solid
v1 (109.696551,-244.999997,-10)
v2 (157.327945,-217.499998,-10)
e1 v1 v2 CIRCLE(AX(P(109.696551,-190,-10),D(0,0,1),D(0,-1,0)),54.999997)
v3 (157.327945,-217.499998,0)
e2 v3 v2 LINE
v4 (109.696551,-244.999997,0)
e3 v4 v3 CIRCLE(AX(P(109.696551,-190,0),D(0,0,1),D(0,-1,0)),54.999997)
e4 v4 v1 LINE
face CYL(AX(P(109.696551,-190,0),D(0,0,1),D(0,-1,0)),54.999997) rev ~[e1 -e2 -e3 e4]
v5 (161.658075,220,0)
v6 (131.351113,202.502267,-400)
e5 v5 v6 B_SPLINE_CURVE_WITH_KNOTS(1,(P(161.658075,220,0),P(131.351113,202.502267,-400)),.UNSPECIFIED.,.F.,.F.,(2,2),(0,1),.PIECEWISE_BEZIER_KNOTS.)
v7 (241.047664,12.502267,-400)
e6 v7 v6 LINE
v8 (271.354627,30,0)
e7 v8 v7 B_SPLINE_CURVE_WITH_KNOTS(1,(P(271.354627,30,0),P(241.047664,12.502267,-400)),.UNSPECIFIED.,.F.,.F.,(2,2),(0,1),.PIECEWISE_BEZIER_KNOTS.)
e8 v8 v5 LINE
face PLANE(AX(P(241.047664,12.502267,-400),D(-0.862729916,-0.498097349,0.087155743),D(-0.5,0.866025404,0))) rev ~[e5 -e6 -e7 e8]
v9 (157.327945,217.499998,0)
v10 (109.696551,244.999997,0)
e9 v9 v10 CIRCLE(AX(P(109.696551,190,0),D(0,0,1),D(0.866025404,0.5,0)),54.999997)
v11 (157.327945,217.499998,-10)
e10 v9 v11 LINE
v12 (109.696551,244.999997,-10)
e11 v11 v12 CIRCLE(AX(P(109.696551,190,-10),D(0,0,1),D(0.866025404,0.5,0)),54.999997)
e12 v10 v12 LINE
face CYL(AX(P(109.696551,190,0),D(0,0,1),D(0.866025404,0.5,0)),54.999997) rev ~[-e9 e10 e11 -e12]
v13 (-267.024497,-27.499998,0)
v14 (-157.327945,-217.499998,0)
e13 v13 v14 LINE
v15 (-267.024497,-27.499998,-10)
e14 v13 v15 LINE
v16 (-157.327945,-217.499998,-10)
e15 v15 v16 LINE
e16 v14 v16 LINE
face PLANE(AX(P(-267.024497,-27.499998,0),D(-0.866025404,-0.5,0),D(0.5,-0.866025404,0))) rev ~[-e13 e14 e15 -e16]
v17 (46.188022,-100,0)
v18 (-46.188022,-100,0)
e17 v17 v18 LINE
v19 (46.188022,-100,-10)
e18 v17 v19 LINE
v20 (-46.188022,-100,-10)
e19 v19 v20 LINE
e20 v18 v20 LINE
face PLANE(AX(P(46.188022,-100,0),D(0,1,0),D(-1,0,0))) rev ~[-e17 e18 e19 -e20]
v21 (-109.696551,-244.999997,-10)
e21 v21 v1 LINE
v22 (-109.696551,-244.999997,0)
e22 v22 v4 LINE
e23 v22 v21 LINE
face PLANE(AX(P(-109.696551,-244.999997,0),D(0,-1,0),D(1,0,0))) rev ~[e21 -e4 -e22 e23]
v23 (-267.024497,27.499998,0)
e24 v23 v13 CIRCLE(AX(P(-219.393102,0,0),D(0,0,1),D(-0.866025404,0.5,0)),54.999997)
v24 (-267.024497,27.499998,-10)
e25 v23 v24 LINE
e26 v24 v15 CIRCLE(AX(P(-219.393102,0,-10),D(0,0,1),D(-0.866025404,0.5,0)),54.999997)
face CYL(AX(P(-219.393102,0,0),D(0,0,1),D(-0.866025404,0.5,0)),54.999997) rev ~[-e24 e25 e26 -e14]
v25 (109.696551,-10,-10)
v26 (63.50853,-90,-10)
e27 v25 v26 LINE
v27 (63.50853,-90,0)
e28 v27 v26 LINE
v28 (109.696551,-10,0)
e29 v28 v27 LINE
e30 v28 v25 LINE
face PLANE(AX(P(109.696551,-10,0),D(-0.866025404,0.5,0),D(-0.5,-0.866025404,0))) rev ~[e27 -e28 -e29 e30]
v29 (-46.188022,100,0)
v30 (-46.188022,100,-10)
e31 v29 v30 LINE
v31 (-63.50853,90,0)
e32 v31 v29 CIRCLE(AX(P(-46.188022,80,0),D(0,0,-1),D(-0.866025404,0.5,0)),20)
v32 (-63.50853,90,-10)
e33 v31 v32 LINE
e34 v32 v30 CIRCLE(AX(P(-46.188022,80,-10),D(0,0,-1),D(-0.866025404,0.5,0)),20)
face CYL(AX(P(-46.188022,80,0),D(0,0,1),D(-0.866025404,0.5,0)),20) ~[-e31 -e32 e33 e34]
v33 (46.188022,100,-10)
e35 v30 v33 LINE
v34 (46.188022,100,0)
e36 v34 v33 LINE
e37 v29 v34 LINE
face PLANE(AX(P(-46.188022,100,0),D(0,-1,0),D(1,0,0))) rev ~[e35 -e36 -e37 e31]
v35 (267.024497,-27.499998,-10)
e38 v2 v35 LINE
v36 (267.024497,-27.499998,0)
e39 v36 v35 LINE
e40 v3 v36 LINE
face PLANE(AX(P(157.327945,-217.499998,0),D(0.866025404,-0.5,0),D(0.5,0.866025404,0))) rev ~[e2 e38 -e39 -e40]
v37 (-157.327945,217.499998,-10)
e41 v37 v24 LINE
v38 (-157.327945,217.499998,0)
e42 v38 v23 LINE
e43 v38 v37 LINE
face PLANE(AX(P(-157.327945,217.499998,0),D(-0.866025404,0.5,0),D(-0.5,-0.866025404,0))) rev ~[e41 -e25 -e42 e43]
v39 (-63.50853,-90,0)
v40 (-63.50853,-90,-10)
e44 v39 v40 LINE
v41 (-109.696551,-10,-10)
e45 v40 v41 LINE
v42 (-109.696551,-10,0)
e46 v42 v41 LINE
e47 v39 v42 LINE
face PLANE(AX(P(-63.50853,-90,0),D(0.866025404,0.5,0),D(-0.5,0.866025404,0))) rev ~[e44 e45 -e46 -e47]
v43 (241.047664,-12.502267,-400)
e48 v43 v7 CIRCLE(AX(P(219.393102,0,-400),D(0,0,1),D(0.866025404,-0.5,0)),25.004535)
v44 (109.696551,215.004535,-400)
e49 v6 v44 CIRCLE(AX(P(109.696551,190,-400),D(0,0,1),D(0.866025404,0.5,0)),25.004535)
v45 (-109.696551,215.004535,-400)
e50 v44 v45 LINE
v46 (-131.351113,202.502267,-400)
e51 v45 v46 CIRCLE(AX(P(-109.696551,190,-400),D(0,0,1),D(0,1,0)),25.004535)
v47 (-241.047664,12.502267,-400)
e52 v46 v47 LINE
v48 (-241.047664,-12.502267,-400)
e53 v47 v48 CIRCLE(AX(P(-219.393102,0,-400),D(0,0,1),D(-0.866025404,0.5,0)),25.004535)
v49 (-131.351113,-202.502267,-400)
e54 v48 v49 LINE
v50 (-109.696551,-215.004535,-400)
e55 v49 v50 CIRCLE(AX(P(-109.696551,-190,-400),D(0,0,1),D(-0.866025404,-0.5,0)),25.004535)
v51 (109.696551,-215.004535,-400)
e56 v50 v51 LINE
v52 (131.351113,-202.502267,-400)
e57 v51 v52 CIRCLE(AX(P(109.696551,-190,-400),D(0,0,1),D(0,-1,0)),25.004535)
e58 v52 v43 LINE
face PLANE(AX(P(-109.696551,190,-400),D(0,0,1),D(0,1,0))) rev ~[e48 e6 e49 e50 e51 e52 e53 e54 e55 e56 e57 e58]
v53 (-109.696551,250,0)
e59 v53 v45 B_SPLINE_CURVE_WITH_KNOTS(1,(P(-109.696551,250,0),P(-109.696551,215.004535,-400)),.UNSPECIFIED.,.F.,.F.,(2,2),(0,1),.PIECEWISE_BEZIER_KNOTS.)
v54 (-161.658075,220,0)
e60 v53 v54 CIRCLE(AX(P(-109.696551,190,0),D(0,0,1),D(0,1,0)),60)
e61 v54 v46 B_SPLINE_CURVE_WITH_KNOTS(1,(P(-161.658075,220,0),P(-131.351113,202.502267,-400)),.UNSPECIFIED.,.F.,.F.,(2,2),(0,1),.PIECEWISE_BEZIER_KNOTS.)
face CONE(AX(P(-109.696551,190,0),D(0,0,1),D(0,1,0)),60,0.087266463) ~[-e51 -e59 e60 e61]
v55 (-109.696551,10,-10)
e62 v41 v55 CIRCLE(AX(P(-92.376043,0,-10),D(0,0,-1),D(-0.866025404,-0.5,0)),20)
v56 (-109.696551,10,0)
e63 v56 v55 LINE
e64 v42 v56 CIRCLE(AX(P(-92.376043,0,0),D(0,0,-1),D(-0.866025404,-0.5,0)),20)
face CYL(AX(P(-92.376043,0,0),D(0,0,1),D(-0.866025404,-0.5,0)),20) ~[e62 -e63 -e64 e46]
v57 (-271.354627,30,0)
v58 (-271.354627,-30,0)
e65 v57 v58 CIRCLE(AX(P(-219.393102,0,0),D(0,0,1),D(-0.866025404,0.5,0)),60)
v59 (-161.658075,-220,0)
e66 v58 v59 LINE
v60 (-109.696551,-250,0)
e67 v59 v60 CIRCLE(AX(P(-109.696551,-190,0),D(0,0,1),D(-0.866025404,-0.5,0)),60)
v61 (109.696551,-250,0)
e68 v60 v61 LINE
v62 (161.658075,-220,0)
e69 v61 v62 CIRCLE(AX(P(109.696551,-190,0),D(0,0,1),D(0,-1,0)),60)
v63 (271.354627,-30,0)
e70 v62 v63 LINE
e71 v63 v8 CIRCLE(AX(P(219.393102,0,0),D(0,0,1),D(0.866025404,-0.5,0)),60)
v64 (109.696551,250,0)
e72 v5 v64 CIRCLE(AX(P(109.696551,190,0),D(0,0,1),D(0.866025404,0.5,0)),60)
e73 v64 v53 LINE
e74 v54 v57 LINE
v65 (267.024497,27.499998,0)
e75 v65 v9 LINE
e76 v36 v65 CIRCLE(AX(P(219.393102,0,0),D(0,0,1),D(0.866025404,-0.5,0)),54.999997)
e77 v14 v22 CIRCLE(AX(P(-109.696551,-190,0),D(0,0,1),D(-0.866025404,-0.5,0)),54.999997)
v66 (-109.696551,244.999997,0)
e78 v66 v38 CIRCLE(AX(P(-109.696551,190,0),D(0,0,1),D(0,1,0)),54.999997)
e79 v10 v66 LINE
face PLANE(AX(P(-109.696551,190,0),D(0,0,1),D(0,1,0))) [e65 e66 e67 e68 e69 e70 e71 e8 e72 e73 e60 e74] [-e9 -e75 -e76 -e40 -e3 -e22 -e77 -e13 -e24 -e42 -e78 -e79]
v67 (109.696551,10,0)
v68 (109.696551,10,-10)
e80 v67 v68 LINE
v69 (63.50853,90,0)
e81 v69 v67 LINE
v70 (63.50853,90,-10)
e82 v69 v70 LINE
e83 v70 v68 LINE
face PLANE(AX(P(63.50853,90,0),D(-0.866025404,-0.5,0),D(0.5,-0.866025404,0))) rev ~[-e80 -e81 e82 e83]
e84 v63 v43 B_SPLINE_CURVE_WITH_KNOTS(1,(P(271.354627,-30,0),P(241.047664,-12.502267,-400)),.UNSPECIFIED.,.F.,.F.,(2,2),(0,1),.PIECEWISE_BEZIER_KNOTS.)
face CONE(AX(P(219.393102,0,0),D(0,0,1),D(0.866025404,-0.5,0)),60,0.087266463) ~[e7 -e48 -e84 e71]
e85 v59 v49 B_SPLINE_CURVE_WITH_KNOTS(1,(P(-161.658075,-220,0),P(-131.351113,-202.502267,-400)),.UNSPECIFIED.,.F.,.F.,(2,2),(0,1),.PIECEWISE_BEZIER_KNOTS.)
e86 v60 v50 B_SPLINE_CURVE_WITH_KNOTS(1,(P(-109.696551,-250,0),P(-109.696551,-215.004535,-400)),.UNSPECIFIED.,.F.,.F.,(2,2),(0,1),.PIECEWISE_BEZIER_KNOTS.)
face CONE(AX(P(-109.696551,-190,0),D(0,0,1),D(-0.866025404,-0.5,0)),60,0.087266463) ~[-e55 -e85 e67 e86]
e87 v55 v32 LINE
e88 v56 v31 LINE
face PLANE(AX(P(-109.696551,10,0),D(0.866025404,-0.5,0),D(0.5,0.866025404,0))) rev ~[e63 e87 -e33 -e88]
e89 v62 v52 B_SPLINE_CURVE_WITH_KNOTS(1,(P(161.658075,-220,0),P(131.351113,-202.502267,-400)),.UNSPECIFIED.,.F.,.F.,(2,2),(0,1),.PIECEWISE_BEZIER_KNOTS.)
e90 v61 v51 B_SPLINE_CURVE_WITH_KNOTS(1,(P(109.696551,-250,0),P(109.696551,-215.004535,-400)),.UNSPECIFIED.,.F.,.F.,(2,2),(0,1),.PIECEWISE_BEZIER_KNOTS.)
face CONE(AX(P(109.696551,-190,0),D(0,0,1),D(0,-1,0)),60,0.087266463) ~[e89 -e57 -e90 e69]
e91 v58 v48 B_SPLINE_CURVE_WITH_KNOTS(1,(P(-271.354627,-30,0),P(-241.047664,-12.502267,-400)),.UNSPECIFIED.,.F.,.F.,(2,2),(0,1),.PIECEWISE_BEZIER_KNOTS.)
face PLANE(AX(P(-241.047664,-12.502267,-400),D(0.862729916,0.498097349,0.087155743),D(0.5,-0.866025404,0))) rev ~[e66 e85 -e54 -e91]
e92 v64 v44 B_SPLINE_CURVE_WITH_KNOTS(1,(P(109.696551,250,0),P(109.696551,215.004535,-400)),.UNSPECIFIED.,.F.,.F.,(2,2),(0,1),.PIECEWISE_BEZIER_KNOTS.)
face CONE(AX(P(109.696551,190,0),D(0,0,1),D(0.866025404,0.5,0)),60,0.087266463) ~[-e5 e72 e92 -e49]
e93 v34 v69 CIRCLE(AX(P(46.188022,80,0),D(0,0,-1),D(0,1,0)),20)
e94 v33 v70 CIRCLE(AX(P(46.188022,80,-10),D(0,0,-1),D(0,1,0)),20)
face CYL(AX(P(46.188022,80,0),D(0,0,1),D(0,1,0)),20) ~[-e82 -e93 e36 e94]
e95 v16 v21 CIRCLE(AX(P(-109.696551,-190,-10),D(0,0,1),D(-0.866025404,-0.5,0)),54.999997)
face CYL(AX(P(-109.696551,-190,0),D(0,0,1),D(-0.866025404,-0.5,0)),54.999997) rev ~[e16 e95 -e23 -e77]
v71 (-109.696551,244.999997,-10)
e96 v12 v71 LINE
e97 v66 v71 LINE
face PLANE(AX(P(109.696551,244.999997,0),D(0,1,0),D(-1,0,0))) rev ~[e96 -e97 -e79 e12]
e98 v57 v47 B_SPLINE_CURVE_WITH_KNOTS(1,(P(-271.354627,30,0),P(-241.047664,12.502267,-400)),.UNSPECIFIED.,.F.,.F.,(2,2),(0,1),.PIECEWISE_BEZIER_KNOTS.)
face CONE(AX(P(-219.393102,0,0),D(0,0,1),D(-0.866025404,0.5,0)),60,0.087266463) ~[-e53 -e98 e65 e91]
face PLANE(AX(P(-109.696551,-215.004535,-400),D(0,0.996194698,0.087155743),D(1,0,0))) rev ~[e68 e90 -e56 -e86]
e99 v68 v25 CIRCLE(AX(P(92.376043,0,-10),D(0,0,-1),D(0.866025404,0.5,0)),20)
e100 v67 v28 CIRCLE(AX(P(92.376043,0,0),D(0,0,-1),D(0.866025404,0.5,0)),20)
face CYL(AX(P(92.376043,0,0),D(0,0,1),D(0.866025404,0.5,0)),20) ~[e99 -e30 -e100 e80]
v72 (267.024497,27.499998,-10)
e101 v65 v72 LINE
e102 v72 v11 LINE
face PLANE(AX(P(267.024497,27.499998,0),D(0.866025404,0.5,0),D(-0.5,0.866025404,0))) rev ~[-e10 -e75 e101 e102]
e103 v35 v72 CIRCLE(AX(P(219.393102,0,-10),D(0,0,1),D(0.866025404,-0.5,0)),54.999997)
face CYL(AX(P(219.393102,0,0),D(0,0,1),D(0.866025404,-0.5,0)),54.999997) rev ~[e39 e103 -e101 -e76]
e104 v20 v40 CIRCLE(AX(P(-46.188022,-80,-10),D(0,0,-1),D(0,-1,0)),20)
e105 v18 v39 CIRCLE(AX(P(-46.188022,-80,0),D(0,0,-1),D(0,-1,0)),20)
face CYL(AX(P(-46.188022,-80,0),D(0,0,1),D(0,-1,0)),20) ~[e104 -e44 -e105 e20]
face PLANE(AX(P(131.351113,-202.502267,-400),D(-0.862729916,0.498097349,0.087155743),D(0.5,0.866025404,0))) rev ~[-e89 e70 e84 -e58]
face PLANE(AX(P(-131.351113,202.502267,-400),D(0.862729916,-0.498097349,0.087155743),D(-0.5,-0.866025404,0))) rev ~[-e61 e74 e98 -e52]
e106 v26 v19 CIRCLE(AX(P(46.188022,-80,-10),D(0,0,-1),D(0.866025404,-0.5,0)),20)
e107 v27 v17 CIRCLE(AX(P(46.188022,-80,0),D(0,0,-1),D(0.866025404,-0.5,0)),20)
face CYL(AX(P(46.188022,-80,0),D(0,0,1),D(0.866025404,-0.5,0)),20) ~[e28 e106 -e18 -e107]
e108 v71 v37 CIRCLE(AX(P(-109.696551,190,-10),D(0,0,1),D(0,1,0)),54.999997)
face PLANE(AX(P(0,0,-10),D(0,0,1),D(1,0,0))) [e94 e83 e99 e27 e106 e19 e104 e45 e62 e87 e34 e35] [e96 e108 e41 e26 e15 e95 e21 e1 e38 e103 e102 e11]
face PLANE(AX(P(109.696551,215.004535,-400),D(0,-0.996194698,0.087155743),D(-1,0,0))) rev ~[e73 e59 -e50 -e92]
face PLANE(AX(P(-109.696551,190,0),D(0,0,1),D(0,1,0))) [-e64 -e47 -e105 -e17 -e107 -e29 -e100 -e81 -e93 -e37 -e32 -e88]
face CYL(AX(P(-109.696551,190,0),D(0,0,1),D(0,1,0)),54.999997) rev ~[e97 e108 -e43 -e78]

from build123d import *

# Parameters (mm, degrees)
F1_DEPTH = 400
F1_TAPER = 5
F2_DEPTH = 10


with BuildPart() as f1:
    # F0 (on Top) → F1 (new body)
    with BuildSketch(Plane.XY):
        with BuildLine():
            Line((109.696551146, 250), (-109.696551146, 250))
            ThreePointArc((-109.696551146, 250), (-139.696551146, 241.9615242271), (-161.6580753731, 220))
            Line((-161.6580753731, 220), (-271.3546265191, 30))
            ThreePointArc((-271.3546265191, 30), (-279.3931022921, 0), (-271.3546265191, -30))
            Line((-271.3546265191, -30), (-161.6580753731, -220))
            ThreePointArc((-161.6580753731, -220), (-139.696551146, -241.9615242271), (-109.696551146, -250))
            Line((-109.696551146, -250), (109.696551146, -250))
            ThreePointArc((109.696551146, -250), (139.696551146, -241.9615242271), (161.6580753731, -220))
            Line((161.6580753731, -220), (271.3546265191, -30))
            ThreePointArc((271.3546265191, -30), (279.3931022921, 0), (271.3546265191, 30))
            Line((271.3546265191, 30), (161.6580753731, 220))
            ThreePointArc((161.6580753731, 220), (139.696551146, 241.9615242271), (109.696551146, 250))
        make_face()
        with BuildLine():
            ThreePointArc((-109.696551146, -244.9999966036), (-137.1965494478, -237.6313942668), (-157.3279454128, -217.4999983018))
            Line((-157.3279454128, -217.4999983018), (-267.0244965589, -27.4999983018))
            ThreePointArc((-267.0244965589, -27.4999983018), (-274.3930988957, 0), (-267.0244965589, 27.4999983018))
            Line((-267.0244965589, 27.4999983018), (-157.3279454128, 217.4999983018))
            ThreePointArc((-157.3279454128, 217.4999983018), (-137.1965494478, 237.6313942668), (-109.696551146, 244.9999966036))
            Line((-109.696551146, 244.9999966036), (109.696551146, 244.9999966036))
            ThreePointArc((109.696551146, 244.9999966036), (137.1965494478, 237.6313942668), (157.3279454128, 217.4999983018))
            Line((157.3279454128, 217.4999983018), (267.0244965589, 27.4999983018))
            ThreePointArc((267.0244965589, 27.4999983018), (274.3930988957, 0), (267.0244965589, -27.4999983018))
            Line((267.0244965589, -27.4999983018), (157.3279454128, -217.4999983018))
            ThreePointArc((157.3279454128, -217.4999983018), (137.1965494478, -237.6313942668), (109.696551146, -244.9999966036))
            Line((109.696551146, -244.9999966036), (-109.696551146, -244.9999966036))
        make_face(mode=Mode.SUBTRACT)
        with BuildLine():
            Line((-267.0244965589, -27.4999983018), (-157.3279454128, -217.4999983018))
            ThreePointArc((-157.3279454128, -217.4999983018), (-137.1965494478, -237.6313942668), (-109.696551146, -244.9999966036))
            Line((-109.696551146, -244.9999966036), (109.696551146, -244.9999966036))
            ThreePointArc((109.696551146, -244.9999966036), (137.1965494478, -237.6313942668), (157.3279454128, -217.4999983018))
            Line((157.3279454128, -217.4999983018), (267.0244965589, -27.4999983018))
            ThreePointArc((267.0244965589, -27.4999983018), (274.3930988957, 0), (267.0244965589, 27.4999983018))
            Line((267.0244965589, 27.4999983018), (157.3279454128, 217.4999983018))
            ThreePointArc((157.3279454128, 217.4999983018), (137.1965494478, 237.6313942668), (109.696551146, 244.9999966036))
            Line((109.696551146, 244.9999966036), (-109.696551146, 244.9999966036))
            ThreePointArc((-109.696551146, 244.9999966036), (-137.1965494478, 237.6313942668), (-157.3279454128, 217.4999983018))
            Line((-157.3279454128, 217.4999983018), (-267.0244965589, 27.4999983018))
            ThreePointArc((-267.0244965589, 27.4999983018), (-274.3930988957, 0), (-267.0244965589, -27.4999983018))
        make_face()
        with BuildLine():
            ThreePointArc((-63.5085296109, 90), (-56.1880215352, 97.3205080757), (-46.1880215352, 100))
            Line((-46.1880215352, 100), (46.1880215352, 100))
            ThreePointArc((46.1880215352, 100), (56.1880215352, 97.3205080757), (63.5085296109, 90))
            Line((63.5085296109, 90), (109.696551146, 10))
            ThreePointArc((109.696551146, 10), (112.3760430703, 0), (109.696551146, -10))
            Line((109.696551146, -10), (63.5085296109, -90))
            ThreePointArc((63.5085296109, -90), (56.1880215352, -97.3205080757), (46.1880215352, -100))
            Line((46.1880215352, -100), (-46.1880215352, -100))
            ThreePointArc((-46.1880215352, -100), (-56.1880215352, -97.3205080757), (-63.5085296109, -90))
            Line((-63.5085296109, -90), (-109.696551146, -10))
            ThreePointArc((-109.696551146, -10), (-112.3760430703, 0), (-109.696551146, 10))
            Line((-109.696551146, 10), (-63.5085296109, 90))
        make_face(mode=Mode.SUBTRACT)
        with BuildLine():
            Line((46.1880215352, 100), (-46.1880215352, 100))
            ThreePointArc((-46.1880215352, 100), (-56.1880215352, 97.3205080757), (-63.5085296109, 90))
            Line((-63.5085296109, 90), (-109.696551146, 10))
            ThreePointArc((-109.696551146, 10), (-112.3760430703, 0), (-109.696551146, -10))
            Line((-109.696551146, -10), (-63.5085296109, -90))
            ThreePointArc((-63.5085296109, -90), (-56.1880215352, -97.3205080757), (-46.1880215352, -100))
            Line((-46.1880215352, -100), (46.1880215352, -100))
            ThreePointArc((46.1880215352, -100), (56.1880215352, -97.3205080757), (63.5085296109, -90))
            Line((63.5085296109, -90), (109.696551146, -10))
            ThreePointArc((109.696551146, -10), (112.3760430703, 0), (109.696551146, 10))
            Line((109.696551146, 10), (63.5085296109, 90))
            ThreePointArc((63.5085296109, 90), (56.1880215352, 97.3205080757), (46.1880215352, 100))
        make_face()
    extrude(amount=-F1_DEPTH, taper=F1_TAPER)

    # F0 (on Top) → F2 (cut)
    with BuildSketch(Plane.XY):
        with BuildLine():
            Line((-267.0244965589, -27.4999983018), (-157.3279454128, -217.4999983018))
            ThreePointArc((-157.3279454128, -217.4999983018), (-137.1965494478, -237.6313942668), (-109.696551146, -244.9999966036))
            Line((-109.696551146, -244.9999966036), (109.696551146, -244.9999966036))
            ThreePointArc((109.696551146, -244.9999966036), (137.1965494478, -237.6313942668), (157.3279454128, -217.4999983018))
            Line((157.3279454128, -217.4999983018), (267.0244965589, -27.4999983018))
            ThreePointArc((267.0244965589, -27.4999983018), (274.3930988957, 0), (267.0244965589, 27.4999983018))
            Line((267.0244965589, 27.4999983018), (157.3279454128, 217.4999983018))
            ThreePointArc((157.3279454128, 217.4999983018), (137.1965494478, 237.6313942668), (109.696551146, 244.9999966036))
            Line((109.696551146, 244.9999966036), (-109.696551146, 244.9999966036))
            ThreePointArc((-109.696551146, 244.9999966036), (-137.1965494478, 237.6313942668), (-157.3279454128, 217.4999983018))
            Line((-157.3279454128, 217.4999983018), (-267.0244965589, 27.4999983018))
            ThreePointArc((-267.0244965589, 27.4999983018), (-274.3930988957, 0), (-267.0244965589, -27.4999983018))
        make_face()
        with BuildLine():
            ThreePointArc((-63.5085296109, 90), (-56.1880215352, 97.3205080757), (-46.1880215352, 100))
            Line((-46.1880215352, 100), (46.1880215352, 100))
            ThreePointArc((46.1880215352, 100), (56.1880215352, 97.3205080757), (63.5085296109, 90))
            Line((63.5085296109, 90), (109.696551146, 10))
            ThreePointArc((109.696551146, 10), (112.3760430703, 0), (109.696551146, -10))
            Line((109.696551146, -10), (63.5085296109, -90))
            ThreePointArc((63.5085296109, -90), (56.1880215352, -97.3205080757), (46.1880215352, -100))
            Line((46.1880215352, -100), (-46.1880215352, -100))
            ThreePointArc((-46.1880215352, -100), (-56.1880215352, -97.3205080757), (-63.5085296109, -90))
            Line((-63.5085296109, -90), (-109.696551146, -10))
            ThreePointArc((-109.696551146, -10), (-112.3760430703, 0), (-109.696551146, 10))
            Line((-109.696551146, 10), (-63.5085296109, 90))
        make_face(mode=Mode.SUBTRACT)
    extrude(amount=-F2_DEPTH, mode=Mode.SUBTRACT)


solid = f1.part
